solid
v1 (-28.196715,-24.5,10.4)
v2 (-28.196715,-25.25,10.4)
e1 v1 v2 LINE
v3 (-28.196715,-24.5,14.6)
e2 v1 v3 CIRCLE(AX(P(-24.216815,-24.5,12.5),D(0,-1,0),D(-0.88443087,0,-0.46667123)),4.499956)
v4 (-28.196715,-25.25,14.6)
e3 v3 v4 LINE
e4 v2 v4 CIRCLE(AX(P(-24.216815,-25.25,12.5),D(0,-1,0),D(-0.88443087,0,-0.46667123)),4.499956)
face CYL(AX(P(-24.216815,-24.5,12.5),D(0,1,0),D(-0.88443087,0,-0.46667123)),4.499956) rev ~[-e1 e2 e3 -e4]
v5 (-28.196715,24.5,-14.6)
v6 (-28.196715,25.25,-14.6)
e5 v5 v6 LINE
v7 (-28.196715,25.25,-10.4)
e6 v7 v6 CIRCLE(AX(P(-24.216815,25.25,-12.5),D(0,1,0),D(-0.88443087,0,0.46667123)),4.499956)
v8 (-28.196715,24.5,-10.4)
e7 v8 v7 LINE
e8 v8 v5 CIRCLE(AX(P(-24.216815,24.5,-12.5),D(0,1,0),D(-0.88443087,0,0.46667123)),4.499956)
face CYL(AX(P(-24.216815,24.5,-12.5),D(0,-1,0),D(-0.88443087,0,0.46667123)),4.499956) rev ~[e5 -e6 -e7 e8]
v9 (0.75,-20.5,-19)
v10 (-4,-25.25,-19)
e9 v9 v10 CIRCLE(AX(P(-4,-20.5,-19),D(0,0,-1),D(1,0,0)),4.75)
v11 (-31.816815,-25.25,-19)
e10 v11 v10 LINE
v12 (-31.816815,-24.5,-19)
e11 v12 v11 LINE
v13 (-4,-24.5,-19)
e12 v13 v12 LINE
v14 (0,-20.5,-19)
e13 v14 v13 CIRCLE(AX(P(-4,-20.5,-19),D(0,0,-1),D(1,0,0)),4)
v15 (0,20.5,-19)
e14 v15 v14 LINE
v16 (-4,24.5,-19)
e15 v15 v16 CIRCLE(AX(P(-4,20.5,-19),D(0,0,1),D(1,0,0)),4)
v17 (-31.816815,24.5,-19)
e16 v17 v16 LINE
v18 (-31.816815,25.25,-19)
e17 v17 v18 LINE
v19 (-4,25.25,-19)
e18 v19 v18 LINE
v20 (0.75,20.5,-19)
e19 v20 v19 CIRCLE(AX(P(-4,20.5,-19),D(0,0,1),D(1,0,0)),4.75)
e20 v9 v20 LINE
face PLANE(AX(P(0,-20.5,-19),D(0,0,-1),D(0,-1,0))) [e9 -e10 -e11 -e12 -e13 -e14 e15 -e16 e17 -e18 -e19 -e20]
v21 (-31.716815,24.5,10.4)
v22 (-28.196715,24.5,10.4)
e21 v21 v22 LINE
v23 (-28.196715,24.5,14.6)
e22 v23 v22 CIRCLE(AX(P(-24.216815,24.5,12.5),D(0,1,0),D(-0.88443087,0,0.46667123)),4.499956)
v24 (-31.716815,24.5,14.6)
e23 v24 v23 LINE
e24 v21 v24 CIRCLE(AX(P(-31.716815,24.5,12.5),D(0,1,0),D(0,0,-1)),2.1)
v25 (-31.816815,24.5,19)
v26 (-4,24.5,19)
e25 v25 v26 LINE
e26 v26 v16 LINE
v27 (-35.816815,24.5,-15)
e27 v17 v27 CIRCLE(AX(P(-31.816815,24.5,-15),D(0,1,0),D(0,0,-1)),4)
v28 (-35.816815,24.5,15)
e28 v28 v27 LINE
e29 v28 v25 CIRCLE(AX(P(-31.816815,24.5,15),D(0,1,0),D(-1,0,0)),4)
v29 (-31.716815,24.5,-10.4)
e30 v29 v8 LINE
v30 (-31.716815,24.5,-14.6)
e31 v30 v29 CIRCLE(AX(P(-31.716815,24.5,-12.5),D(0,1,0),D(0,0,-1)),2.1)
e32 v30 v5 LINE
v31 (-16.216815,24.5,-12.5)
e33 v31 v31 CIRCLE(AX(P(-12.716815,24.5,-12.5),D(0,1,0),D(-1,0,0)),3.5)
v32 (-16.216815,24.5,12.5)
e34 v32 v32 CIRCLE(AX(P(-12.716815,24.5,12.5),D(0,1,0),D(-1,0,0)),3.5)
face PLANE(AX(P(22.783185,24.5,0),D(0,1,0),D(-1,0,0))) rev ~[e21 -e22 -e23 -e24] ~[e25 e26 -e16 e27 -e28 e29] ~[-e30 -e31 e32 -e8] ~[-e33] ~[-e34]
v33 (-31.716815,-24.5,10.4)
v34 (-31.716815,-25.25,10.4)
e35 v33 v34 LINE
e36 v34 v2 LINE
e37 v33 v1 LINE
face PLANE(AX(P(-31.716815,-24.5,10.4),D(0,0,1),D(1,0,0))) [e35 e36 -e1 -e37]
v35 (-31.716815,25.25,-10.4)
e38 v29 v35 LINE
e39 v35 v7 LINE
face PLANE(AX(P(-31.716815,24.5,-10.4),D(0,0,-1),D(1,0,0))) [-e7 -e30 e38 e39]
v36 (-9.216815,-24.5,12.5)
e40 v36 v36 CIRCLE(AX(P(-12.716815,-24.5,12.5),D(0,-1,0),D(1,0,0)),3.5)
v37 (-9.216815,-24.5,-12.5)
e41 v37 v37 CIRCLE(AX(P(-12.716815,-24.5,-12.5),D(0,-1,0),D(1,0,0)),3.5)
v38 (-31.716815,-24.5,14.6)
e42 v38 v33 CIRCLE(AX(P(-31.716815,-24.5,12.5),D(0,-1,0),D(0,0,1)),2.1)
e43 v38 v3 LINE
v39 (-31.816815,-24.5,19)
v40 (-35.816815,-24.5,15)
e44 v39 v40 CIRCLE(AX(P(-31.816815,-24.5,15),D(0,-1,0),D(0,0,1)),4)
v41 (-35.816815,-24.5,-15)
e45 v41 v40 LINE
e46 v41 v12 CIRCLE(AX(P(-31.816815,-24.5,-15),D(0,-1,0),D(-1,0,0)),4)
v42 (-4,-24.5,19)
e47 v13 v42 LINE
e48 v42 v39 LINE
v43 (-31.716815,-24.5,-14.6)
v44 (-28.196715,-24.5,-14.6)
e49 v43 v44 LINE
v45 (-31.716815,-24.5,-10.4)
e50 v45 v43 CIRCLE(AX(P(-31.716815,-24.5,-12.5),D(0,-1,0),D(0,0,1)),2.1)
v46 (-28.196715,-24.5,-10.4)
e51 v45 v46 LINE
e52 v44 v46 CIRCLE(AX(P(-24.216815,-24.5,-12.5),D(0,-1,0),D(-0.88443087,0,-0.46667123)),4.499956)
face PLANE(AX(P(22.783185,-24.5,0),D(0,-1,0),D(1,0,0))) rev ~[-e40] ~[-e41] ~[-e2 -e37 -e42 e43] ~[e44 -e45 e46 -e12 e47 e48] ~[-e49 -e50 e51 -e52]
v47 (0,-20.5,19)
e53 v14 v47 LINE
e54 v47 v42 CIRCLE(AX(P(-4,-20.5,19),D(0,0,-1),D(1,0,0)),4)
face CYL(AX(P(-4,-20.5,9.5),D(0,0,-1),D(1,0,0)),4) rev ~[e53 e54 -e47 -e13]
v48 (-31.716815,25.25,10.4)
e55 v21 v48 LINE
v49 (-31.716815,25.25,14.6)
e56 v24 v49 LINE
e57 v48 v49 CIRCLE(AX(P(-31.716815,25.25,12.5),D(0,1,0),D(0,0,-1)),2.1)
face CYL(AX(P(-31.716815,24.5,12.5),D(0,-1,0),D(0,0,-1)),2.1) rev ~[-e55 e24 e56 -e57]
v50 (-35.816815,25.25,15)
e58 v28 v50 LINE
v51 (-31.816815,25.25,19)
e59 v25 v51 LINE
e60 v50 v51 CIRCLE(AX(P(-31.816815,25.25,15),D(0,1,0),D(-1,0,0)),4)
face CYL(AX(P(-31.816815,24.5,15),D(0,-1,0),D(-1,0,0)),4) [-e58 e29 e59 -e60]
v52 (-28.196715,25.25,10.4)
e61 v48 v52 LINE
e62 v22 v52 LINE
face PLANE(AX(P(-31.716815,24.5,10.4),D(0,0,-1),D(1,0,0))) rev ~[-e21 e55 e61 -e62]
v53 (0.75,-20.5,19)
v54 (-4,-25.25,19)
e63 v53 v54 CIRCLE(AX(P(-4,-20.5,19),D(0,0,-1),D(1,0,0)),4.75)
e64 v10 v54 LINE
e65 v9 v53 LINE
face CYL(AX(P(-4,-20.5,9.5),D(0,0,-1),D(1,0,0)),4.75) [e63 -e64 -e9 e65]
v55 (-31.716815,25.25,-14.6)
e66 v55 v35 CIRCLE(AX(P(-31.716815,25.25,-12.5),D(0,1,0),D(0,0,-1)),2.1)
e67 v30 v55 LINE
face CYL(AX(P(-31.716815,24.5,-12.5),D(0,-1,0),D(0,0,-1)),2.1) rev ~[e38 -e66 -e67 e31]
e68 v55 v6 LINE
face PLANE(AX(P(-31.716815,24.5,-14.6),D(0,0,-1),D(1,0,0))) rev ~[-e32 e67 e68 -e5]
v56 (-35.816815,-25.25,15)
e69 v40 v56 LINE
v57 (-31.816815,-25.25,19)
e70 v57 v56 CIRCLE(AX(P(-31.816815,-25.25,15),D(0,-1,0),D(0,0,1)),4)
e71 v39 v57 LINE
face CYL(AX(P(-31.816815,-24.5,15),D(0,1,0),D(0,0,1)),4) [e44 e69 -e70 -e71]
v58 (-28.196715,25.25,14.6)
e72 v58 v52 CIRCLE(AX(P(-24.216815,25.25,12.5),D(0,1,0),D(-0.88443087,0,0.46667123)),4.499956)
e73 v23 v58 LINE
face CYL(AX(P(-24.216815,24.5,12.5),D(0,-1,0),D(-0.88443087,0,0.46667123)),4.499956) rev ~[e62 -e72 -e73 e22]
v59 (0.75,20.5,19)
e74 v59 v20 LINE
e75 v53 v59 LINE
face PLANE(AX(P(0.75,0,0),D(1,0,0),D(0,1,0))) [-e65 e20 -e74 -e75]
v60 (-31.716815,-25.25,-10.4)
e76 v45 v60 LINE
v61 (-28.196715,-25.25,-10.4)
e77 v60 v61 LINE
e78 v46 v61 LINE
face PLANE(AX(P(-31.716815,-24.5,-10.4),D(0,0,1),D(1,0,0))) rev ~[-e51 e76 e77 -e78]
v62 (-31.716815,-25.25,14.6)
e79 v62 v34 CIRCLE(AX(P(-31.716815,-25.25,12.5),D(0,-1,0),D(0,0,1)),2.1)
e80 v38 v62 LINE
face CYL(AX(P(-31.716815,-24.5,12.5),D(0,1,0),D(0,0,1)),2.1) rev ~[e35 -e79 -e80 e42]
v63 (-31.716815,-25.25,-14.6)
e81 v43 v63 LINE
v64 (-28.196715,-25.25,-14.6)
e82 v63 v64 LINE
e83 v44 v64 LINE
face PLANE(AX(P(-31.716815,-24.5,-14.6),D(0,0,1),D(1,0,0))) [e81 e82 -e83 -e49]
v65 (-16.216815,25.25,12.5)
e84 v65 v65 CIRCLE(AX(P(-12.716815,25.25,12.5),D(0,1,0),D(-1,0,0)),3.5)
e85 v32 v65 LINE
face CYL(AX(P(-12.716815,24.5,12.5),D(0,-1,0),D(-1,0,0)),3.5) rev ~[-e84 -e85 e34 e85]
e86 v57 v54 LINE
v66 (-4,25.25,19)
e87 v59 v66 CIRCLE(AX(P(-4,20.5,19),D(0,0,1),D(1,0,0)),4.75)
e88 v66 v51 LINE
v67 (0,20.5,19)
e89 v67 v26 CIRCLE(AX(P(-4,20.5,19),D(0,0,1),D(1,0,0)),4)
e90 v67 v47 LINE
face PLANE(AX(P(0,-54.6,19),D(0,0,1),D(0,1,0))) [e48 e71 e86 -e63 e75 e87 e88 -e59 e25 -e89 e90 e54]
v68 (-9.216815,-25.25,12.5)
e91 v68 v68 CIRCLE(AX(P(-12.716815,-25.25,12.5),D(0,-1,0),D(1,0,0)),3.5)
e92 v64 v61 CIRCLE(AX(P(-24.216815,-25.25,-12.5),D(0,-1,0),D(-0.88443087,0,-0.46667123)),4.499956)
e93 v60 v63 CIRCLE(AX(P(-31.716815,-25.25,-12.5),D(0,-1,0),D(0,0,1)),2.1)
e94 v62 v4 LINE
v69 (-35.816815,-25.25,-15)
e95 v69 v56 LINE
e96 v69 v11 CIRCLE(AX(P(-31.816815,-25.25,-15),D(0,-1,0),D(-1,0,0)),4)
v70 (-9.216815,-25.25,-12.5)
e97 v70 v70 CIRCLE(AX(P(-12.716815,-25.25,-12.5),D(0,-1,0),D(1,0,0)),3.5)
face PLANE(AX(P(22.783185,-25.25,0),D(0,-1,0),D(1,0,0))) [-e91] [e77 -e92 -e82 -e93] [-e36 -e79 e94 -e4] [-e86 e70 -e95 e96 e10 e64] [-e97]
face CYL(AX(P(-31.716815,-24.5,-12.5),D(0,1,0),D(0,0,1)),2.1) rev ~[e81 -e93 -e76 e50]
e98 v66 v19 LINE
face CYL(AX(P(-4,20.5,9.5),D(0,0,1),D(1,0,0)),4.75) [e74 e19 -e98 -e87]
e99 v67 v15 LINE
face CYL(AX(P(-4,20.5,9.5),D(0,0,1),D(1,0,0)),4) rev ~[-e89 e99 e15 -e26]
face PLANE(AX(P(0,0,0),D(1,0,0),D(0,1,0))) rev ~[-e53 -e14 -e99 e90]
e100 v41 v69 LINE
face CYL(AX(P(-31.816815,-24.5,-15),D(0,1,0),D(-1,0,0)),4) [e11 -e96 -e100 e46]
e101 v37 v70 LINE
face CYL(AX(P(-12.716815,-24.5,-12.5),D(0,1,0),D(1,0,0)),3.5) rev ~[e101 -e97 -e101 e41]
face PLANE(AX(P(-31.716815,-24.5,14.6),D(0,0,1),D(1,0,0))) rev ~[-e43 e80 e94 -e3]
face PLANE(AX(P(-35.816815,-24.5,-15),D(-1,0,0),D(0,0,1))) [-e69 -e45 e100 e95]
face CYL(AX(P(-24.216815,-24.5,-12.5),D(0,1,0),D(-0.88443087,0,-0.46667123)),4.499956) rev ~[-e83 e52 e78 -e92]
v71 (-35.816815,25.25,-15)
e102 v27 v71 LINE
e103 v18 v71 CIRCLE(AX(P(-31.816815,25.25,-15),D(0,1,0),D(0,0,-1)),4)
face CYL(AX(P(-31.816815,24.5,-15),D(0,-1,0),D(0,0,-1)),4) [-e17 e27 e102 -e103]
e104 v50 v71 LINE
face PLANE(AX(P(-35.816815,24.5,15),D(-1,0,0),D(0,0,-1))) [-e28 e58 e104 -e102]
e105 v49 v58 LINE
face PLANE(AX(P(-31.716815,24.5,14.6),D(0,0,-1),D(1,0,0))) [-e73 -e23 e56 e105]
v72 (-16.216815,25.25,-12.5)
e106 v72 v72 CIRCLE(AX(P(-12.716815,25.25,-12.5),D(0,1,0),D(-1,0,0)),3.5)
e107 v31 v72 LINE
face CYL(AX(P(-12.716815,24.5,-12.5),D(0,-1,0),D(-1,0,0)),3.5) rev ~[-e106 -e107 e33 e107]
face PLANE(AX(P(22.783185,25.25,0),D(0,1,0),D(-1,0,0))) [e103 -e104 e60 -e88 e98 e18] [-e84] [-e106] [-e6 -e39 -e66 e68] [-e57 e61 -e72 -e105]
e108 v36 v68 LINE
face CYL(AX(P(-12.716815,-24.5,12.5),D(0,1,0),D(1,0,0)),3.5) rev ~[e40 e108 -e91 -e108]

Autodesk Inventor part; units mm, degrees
ref_plane "YZ Plane" through (0, 0, 0) normal (1, 0, 0) x (0, 1, 0)
ref_plane "XZ Plane" through (0, 0, 0) normal (0, 1, 0) x (-1, 0, 0)
ref_plane "XY Plane" through (0, 0, 0) normal (0, 0, 1) x (1, 0, 0)
sketch "スケッチ1" plane through (0, 0, 0) normal (1, 0, 0) x (0, 1, 0)
  line L0 (-54.6, 19) -> (54.6, 19)
  line L1 (58.6, 15) -> (58.6, -15)
  line L2 (54.6, -19) -> (-54.6, -19)
  line L3 (-58.6, -15) -> (-58.6, 15)
  line L4 (-58.6, 19) -> (58.6, -19) construction
  line L5 (58.6, 19) -> (-58.6, -19) construction
  arc A0 (-50.9799, 10.4) -> (-50.9799, 14.6) centre (-47, 12.5) ccw
  line L6 (-54.5, 10.4) -> (-50.9799, 10.4)
  line L7 (-54.5, 14.6) -> (-50.9799, 14.6)
  arc A1 (-54.5, 14.6) -> (-54.5, 10.4) centre (-54.5, 12.5) ccw
  line L8 (-54.5, 12.5) -> (-47, 12.5) construction
  line L9 (-58.6, 0) -> (58.6, 0) construction
  line L10 (-54.5, 19) -> (-54.5, -19) construction
  line L11 (-58.6, -19) -> (58.6, 19) construction
  line L12 (-54.5, -14.6) -> (-50.9799, -14.6)
  arc A2 (-54.5, -10.4) -> (-54.5, -14.6) centre (-54.5, -12.5) ccw
  line L13 (-54.5, -10.4) -> (-50.9799, -10.4)
  arc A3 (-50.9799, -14.6) -> (-50.9799, -10.4) centre (-47, -12.5) ccw
  line L14 (-54.5, -12.5) -> (-47, -12.5) construction
  line L15 (-54.5, -19) -> (-54.5, 19) construction
  line L16 (0, 19) -> (0, -19) construction
  line L17 (58.6, 19) -> (-58.6, -19) construction
  line L18 (-58.6, 19) -> (58.6, -19) construction
  line L19 (54.5, 14.6) -> (50.9799, 14.6)
  arc A4 (54.5, 10.4) -> (54.5, 14.6) centre (54.5, 12.5) ccw
  line L20 (54.5, 10.4) -> (50.9799, 10.4)
  arc A5 (50.9799, 14.6) -> (50.9799, 10.4) centre (47, 12.5) ccw
  line L21 (54.5, 12.5) -> (47, 12.5) construction
  line L22 (58.6, 0) -> (-58.6, 0) construction
  line L23 (54.5, 19) -> (54.5, -19) construction
  arc A6 (54.5, -14.6) -> (54.5, -10.4) centre (54.5, -12.5) ccw
  line L24 (54.5, -14.6) -> (50.9799, -14.6)
  line L25 (54.5, -10.4) -> (50.9799, -10.4)
  line L26 (54.5, -12.5) -> (47, -12.5) construction
  arc A7 (50.9799, -10.4) -> (50.9799, -14.6) centre (47, -12.5) ccw
  line L27 (54.5, -19) -> (54.5, 19) construction
  line L28 (58.6, -19) -> (-58.6, 19) construction
  arc A8 (-54.6, 19) -> (-58.6, 15) centre (-54.6, 15) ccw
  arc A9 (-58.6, -15) -> (-54.6, -19) centre (-54.6, -15) ccw
  arc A10 (58.6, 15) -> (54.6, 19) centre (54.6, 15) ccw
  arc A11 (54.6, -19) -> (58.6, -15) centre (54.6, -15) ccw
  line L29 (-20.5, 19) -> (-20.5, -19)
  line L30 (20.5, 19) -> (20.5, -19)
  line L31 (-16.5, 19) -> (-16.5, -19) construction
  line L32 (16.5, 19) -> (16.5, -19) construction
  line L33 (-24.5, 19) -> (-24.5, -19) construction
  line L34 (24.5, 19) -> (24.5, -19) construction
  circle A12 centre (-35.5, 12.5) radius 3.5
  circle A13 centre (-35.5, -12.5) radius 3.5
  circle A14 centre (35.5, 12.5) radius 3.5
  circle A15 centre (35.5, -12.5) radius 3.5
  point P0 (0, 0)
  point P1 (0, 0)
  point P2 (43.6458, 9.5001)
  point P3 (43.6458, 15.4999)
  point P4 (43.6458, -15.4999)
  point P5 (43.6458, -9.5001)
  point P6 (-43.6458, 15.4999)
  point P7 (-43.6458, 9.5001)
  point P8 (-43.6458, -9.5001)
  point P9 (-43.6458, -15.4999)
  dimension "d0" = 117.2
  dimension "d1" = 9
  dimension "d2" = 4.2
  dimension "d3" = 7.5
  dimension "d5" = 2
  dimension "d6" = 25
  dimension "d7" = 2
  dimension "d8" = 38
  dimension "d13" = 4
  dimension "d15" = 33
  dimension "d16" = 30
  dimension "d17" = 8
  dimension "d22" = 7
  dimension "d23" = 19
extrude "押し出し1" add sketch "スケッチ1" along normal blind 0.75
bend part "曲げパーツ1" radius 4 angle 90 line through (0, -20.5, 19) along (0, 0, -1) centre toward (-1, 0, 0) moving side (0, -1, 0) both sides no
bend part "曲げパーツ2" radius 4 angle 90 line through (0, 20.5, 19) along (0, 0, -1) centre toward (-1, 0, 0) moving side (0, 1, 0) both sides no
equation "\"d7\" = d5"
equation "\"d18\" = 0.5 * d17"
equation "\"d20\" = 0.5 * d17"
properties part number "Head_back_cloth"
